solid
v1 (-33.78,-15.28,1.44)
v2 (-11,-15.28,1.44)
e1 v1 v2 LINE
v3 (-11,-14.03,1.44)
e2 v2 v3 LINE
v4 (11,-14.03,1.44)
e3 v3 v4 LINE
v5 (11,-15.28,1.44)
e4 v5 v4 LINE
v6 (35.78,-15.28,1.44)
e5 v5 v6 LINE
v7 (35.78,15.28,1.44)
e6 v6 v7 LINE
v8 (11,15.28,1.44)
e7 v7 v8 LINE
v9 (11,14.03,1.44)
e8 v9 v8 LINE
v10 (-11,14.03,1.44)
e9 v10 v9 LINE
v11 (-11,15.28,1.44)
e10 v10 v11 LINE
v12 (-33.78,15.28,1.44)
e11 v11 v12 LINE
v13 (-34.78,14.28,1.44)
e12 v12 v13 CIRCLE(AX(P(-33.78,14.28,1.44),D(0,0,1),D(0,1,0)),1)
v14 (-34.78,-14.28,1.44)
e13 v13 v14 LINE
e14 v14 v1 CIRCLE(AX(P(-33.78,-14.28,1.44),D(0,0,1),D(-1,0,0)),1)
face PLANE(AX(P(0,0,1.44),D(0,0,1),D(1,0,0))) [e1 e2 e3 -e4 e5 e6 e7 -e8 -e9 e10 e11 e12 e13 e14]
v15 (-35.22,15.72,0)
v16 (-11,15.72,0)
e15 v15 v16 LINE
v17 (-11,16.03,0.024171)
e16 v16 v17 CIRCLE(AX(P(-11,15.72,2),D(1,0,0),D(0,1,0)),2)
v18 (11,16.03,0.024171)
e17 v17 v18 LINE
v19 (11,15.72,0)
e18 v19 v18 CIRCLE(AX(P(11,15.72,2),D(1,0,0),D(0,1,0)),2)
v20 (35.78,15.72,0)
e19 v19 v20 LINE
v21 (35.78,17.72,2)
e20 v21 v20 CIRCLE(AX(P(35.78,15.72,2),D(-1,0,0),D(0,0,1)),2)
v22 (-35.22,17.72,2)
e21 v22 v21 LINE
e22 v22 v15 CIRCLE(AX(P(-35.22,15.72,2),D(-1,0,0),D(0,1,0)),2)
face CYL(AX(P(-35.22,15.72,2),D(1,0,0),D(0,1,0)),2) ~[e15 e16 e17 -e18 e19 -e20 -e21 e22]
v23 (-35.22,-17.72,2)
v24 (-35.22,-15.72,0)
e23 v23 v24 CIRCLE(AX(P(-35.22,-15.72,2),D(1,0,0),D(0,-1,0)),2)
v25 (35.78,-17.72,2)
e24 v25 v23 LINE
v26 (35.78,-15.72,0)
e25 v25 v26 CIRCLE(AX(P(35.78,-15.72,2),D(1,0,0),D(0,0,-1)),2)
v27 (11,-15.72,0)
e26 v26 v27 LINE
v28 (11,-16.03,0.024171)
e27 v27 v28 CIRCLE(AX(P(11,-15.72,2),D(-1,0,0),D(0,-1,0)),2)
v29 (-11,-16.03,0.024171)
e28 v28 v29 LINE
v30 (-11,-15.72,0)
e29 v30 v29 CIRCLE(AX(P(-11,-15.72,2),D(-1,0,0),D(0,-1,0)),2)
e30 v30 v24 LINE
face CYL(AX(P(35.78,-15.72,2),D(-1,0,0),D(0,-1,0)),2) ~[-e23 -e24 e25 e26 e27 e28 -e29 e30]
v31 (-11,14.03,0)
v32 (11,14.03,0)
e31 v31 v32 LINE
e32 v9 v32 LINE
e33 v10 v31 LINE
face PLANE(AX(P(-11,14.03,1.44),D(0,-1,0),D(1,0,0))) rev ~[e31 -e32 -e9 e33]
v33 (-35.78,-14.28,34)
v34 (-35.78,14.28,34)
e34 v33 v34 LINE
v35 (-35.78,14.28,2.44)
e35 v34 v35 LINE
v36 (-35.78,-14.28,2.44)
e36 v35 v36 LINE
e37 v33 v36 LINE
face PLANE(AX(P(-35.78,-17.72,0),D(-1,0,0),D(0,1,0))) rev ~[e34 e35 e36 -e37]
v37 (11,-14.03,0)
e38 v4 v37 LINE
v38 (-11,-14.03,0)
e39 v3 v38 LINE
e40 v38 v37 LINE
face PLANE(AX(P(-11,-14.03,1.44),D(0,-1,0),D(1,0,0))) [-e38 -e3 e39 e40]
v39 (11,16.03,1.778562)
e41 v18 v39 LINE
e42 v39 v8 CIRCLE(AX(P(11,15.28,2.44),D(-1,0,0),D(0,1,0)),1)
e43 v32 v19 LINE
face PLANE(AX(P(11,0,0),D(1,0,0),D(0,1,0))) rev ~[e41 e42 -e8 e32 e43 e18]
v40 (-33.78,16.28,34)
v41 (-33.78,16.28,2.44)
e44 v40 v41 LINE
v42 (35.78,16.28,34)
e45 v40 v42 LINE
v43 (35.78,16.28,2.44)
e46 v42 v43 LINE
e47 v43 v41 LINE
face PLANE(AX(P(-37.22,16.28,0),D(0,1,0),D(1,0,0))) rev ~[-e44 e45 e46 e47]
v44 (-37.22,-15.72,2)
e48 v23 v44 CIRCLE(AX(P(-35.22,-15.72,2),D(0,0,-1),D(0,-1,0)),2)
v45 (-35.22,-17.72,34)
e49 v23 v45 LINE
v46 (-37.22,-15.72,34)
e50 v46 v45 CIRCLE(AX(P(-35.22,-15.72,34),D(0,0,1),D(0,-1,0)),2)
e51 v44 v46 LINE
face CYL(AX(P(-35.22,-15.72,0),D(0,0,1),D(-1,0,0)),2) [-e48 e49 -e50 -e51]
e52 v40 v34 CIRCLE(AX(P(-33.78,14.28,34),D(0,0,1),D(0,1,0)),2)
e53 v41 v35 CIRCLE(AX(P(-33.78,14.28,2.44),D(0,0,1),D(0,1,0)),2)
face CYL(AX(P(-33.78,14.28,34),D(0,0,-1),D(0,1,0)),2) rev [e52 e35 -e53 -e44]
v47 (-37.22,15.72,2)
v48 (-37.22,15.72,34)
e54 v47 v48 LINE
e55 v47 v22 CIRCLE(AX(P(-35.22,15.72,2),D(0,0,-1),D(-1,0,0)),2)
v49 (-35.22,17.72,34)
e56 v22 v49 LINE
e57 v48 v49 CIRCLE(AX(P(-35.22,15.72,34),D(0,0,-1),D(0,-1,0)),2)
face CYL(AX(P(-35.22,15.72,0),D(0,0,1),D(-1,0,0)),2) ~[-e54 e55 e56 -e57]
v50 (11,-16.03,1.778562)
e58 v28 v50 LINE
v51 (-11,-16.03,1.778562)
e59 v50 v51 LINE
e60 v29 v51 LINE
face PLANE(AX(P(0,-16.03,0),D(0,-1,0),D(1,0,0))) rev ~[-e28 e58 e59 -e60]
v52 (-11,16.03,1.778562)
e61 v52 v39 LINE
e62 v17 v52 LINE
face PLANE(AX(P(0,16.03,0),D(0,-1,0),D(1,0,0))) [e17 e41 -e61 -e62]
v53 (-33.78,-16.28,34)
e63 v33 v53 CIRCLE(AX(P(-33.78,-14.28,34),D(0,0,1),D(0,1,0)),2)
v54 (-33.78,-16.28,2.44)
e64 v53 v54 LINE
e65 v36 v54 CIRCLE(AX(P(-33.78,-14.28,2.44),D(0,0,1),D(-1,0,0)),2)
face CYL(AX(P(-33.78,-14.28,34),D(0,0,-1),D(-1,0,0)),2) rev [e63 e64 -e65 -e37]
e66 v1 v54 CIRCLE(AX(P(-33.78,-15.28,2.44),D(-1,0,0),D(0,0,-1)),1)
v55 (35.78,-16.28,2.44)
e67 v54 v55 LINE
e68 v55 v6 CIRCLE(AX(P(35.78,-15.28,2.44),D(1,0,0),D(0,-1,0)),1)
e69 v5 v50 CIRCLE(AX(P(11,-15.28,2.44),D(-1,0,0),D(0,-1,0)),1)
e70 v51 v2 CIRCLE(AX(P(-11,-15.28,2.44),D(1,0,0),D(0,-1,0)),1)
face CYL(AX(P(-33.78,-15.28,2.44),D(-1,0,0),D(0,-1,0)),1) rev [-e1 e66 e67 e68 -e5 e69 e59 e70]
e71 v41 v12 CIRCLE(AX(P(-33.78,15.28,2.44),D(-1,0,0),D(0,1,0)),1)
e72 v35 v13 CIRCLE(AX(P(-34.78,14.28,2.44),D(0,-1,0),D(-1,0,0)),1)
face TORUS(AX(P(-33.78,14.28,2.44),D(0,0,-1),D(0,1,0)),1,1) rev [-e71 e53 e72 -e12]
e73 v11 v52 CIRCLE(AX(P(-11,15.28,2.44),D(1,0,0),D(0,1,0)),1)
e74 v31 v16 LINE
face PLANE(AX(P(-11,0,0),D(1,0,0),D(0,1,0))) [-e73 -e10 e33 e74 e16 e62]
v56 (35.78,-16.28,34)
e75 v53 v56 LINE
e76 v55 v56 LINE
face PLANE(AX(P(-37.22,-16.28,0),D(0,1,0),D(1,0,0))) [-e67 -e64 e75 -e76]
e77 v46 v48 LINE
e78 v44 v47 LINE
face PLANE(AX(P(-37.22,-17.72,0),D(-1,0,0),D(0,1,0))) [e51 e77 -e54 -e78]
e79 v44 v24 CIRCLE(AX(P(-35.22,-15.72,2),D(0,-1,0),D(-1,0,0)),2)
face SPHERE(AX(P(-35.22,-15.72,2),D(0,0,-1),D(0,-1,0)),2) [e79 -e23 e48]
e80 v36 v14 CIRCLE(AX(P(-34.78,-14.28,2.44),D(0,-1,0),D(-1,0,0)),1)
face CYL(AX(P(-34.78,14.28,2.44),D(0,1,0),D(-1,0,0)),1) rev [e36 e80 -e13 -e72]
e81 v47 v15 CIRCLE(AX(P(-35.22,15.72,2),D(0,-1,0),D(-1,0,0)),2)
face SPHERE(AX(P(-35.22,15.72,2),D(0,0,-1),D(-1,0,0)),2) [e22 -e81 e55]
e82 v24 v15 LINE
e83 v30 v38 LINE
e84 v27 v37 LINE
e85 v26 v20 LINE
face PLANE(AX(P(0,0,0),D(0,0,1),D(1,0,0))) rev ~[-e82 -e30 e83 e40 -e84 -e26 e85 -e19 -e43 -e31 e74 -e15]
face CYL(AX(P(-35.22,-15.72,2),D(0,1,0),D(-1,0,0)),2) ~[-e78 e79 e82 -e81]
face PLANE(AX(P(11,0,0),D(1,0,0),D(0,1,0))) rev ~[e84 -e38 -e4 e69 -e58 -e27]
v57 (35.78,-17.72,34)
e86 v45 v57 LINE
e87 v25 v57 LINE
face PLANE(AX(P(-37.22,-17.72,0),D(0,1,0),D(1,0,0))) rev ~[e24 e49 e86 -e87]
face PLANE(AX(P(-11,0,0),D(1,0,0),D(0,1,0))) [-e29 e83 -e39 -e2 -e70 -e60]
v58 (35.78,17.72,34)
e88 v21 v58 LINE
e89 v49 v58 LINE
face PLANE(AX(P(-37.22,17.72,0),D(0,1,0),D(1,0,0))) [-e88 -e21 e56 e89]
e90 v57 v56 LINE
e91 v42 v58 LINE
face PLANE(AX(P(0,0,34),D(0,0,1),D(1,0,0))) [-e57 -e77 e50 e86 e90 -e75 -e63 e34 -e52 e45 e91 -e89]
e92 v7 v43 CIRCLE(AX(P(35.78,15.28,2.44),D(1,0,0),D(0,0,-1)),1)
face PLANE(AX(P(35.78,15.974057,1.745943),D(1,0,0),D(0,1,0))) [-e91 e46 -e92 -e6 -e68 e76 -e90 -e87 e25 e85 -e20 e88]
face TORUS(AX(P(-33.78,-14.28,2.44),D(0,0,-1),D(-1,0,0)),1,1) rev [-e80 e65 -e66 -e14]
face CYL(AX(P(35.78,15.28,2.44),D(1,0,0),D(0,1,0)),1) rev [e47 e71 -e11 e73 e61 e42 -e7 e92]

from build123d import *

# Parameters (mm, degrees)
F0_W         = 74.44
F0_H         = 35.44
F1_DEPTH     = 34
F2_T         = -1.44
F3_DEPTH     = 1.44
F4_R         = 2
F5_R         = 2
F6_W         = 22
F6_H         = 2
F7_DEPTH     = 1.441
F8_T1_DEPTH  = 28.56
F8_T6_DEPTH  = 69.56
F8_T12_DEPTH = 69.56
F8_T18_DEPTH = 69.56
F8_T25_DEPTH = 69.56
F8_T31_DEPTH = 69.56
F8_T35_ANGLE = 90
F8_T37_ANGLE = 90
F8_T41_DEPTH = 69.56
F8_T47_DEPTH = 69.56
F8_T53_DEPTH = 69.56
F8_T60_DEPTH = 69.56
F8_T66_DEPTH = 69.56


# Not quite as in the source:
# - a fillet or chamfer that OpenCascade refuses, or shapes differently, is made with other operations: its cross-section is extruded or revolved along the edge and cut away or added


with BuildPart() as f1:
    # F0 (on Top) → F1 (new body)
    with BuildSketch(Plane.XY):
        Rectangle(F0_W, F0_H)
    extrude(amount=F1_DEPTH)

    # F2
    f2_openings = [f1.faces().sort_by_distance(p)[0] for p in [
        (0, 0, 34),
    ]]
    offset(amount=F2_T, openings=f2_openings)

    # F3 (cut): a face of the model
    f3_faces = [f1.faces().sort_by_distance(p)[0] for p in [
        (37.22, 0, 17),
    ]]
    extrude(f3_faces, amount=-F3_DEPTH, mode=Mode.SUBTRACT)

    # F4
    f4_edges = [f1.edges().sort_by_distance(p)[0] for p in [
        (-35.78, -16.28, 17.72),
        (-35.78, 16.28, 17.72),
        (-37.22, 17.72, 17),
        (-37.22, -17.72, 17),
    ]]
    fillet(f4_edges, radius=F4_R)

    # F5
    f5_edges = [f1.edges().sort_by_distance(p)[0] for p in [
        (-37.22, 0, 0),
        (0.28, -17.72, 0),
        (0.28, 17.72, 0),
    ]]
    fillet(f5_edges, radius=F5_R)

    # F6 (on face) → F7 (cut, through all)
    with BuildSketch(Plane.XY.offset(1.44)):
        with Locations((0, 15.03)):
            Rectangle(F6_W, F6_H)
        with Locations((0, -15.03)):
            Rectangle(F6_W, F6_H)
    extrude(amount=-F7_DEPTH, mode=Mode.SUBTRACT)

    # F8: fillet of radius 1 on 1 edges, made by hand

    # F8_s2 → F8_t1 (join)
    with BuildSketch(Plane.XZ.offset(-14.28)):
        with BuildLine():
            ThreePointArc((-35.78, 2.44), (-35.4871067812, 1.7328932188), (-34.78, 1.44))
            Line((-34.78, 1.44), (-35.78, 1.44))
            Line((-35.78, 1.44), (-35.78, 2.44))
        make_face()
    extrude(amount=F8_T1_DEPTH)


with BuildPart() as f8_tool4:
    # F8_s5 → F8_t6 (new body)
    with BuildSketch(Plane.YZ.offset(-33.78)):
        with BuildLine():
            ThreePointArc((-16.28, 2.44), (-15.9871067812, 1.7328932188), (-15.28, 1.44))
            Line((-15.28, 1.44), (-16.28, 1.44))
            Line((-16.28, 1.44), (-16.28, 2.44))
        make_face()
    extrude(amount=F8_T6_DEPTH)

    split(bisect_by=Plane.YZ.offset(-11), keep=Keep.BOTTOM)

    split(bisect_by=Plane.XZ.offset(16.03), keep=Keep.TOP)


with BuildPart() as f1_1:
    add(f1.part)

    # F8_t3: union F8_tool4
    add(f8_tool4.part)


with BuildPart() as f8_tool10:
    # F8_s11 → F8_t12 (new body)
    with BuildSketch(Plane.YZ.offset(-33.78)):
        with BuildLine():
            ThreePointArc((-16.28, 2.44), (-15.9871067812, 1.7328932188), (-15.28, 1.44))
            Line((-15.28, 1.44), (-16.28, 1.44))
            Line((-16.28, 1.44), (-16.28, 2.44))
        make_face()
    extrude(amount=F8_T12_DEPTH)

    split(bisect_by=Plane.YZ.offset(-11), keep=Keep.BOTTOM)

    split(bisect_by=Plane.XZ.offset(16.03), keep=Keep.BOTTOM)


with BuildPart() as f1_2:
    add(f1_1.part)

    # F8_t9: union F8_tool10
    add(f8_tool10.part)


with BuildPart() as f8_tool16:
    # F8_s17 → F8_t18 (new body)
    with BuildSketch(Plane.YZ.offset(-33.78)):
        with BuildLine():
            ThreePointArc((-16.28, 2.44), (-15.9871067812, 1.7328932188), (-15.28, 1.44))
            Line((-15.28, 1.44), (-16.28, 1.44))
            Line((-16.28, 1.44), (-16.28, 2.44))
        make_face()
    extrude(amount=F8_T18_DEPTH)

    split(bisect_by=Plane.YZ.offset(-11), keep=Keep.TOP)

    split(bisect_by=Plane.XZ.offset(16.03), keep=Keep.TOP)

    split(bisect_by=Plane.YZ.offset(11), keep=Keep.BOTTOM)


with BuildPart() as f1_3:
    add(f1_2.part)

    # F8_t15: union F8_tool16
    add(f8_tool16.part)


with BuildPart() as f8_tool23:
    # F8_s24 → F8_t25 (new body)
    with BuildSketch(Plane.YZ.offset(-33.78)):
        with BuildLine():
            ThreePointArc((-16.28, 2.44), (-15.9871067812, 1.7328932188), (-15.28, 1.44))
            Line((-15.28, 1.44), (-16.28, 1.44))
            Line((-16.28, 1.44), (-16.28, 2.44))
        make_face()
    extrude(amount=F8_T25_DEPTH)

    split(bisect_by=Plane.XZ.offset(16.03), keep=Keep.TOP)

    split(bisect_by=Plane.YZ.offset(11), keep=Keep.TOP)


with BuildPart() as f1_4:
    add(f1_3.part)

    # F8_t22: union F8_tool23
    add(f8_tool23.part)


with BuildPart() as f8_tool29:
    # F8_s30 → F8_t31 (new body)
    with BuildSketch(Plane.YZ.offset(-33.78)):
        with BuildLine():
            ThreePointArc((-16.28, 2.44), (-15.9871067812, 1.7328932188), (-15.28, 1.44))
            Line((-15.28, 1.44), (-16.28, 1.44))
            Line((-16.28, 1.44), (-16.28, 2.44))
        make_face()
    extrude(amount=F8_T31_DEPTH)

    split(bisect_by=Plane.XZ.offset(16.03), keep=Keep.BOTTOM)

    split(bisect_by=Plane.YZ.offset(11), keep=Keep.TOP)


with BuildPart() as f1_5:
    add(f1_4.part)

    # F8_t28: union F8_tool29
    add(f8_tool29.part)

    # F8_s34 → F8_t35 (revolve)
    with BuildSketch(Plane.XZ.offset(14.28)):
        with BuildLine():
            ThreePointArc((-35.78, 2.44), (-35.4871067812, 1.7328932188), (-34.78, 1.44))
            Line((-34.78, 1.44), (-35.78, 1.44))
            Line((-35.78, 1.44), (-35.78, 2.44))
        make_face()
    revolve(axis=Axis((-33.78, -14.28, 1.44), (0, 0, 1)), revolution_arc=F8_T35_ANGLE)

    # F8_s36 → F8_t37 (revolve)
    with BuildSketch(Plane.YZ.offset(-33.78)):
        with BuildLine():
            ThreePointArc((16.28, 2.44), (15.9871067812, 1.7328932188), (15.28, 1.44))
            Line((15.28, 1.44), (16.28, 1.44))
            Line((16.28, 1.44), (16.28, 2.44))
        make_face()
    revolve(axis=Axis((-33.78, 14.28, 1.44), (0, 0, 1)), revolution_arc=F8_T37_ANGLE)


with BuildPart() as f8_tool39:
    # F8_s40 → F8_t41 (new body)
    with BuildSketch(Plane.YZ.offset(35.78)):
        with BuildLine():
            ThreePointArc((16.28, 2.44), (15.9871067812, 1.7328932188), (15.28, 1.44))
            Line((15.28, 1.44), (16.28, 1.44))
            Line((16.28, 1.44), (16.28, 2.44))
        make_face()
    extrude(amount=-F8_T41_DEPTH)

    split(bisect_by=Plane.YZ.offset(11), keep=Keep.TOP)

    split(bisect_by=Plane.XZ.offset(-16.03), keep=Keep.BOTTOM)


with BuildPart() as f1_6:
    add(f1_5.part)

    # F8_t38: union F8_tool39
    add(f8_tool39.part)


with BuildPart() as f8_tool45:
    # F8_s46 → F8_t47 (new body)
    with BuildSketch(Plane.YZ.offset(35.78)):
        with BuildLine():
            ThreePointArc((16.28, 2.44), (15.9871067812, 1.7328932188), (15.28, 1.44))
            Line((15.28, 1.44), (16.28, 1.44))
            Line((16.28, 1.44), (16.28, 2.44))
        make_face()
    extrude(amount=-F8_T47_DEPTH)

    split(bisect_by=Plane.YZ.offset(11), keep=Keep.TOP)

    split(bisect_by=Plane.XZ.offset(-16.03), keep=Keep.TOP)


with BuildPart() as f1_7:
    add(f1_6.part)

    # F8_t44: union F8_tool45
    add(f8_tool45.part)


with BuildPart() as f8_tool51:
    # F8_s52 → F8_t53 (new body)
    with BuildSketch(Plane.YZ.offset(35.78)):
        with BuildLine():
            ThreePointArc((16.28, 2.44), (15.9871067812, 1.7328932188), (15.28, 1.44))
            Line((15.28, 1.44), (16.28, 1.44))
            Line((16.28, 1.44), (16.28, 2.44))
        make_face()
    extrude(amount=-F8_T53_DEPTH)

    split(bisect_by=Plane.YZ.offset(11), keep=Keep.BOTTOM)

    split(bisect_by=Plane.XZ.offset(-16.03), keep=Keep.BOTTOM)

    split(bisect_by=Plane.YZ.offset(-11), keep=Keep.TOP)


with BuildPart() as f1_8:
    add(f1_7.part)

    # F8_t50: union F8_tool51
    add(f8_tool51.part)


with BuildPart() as f8_tool58:
    # F8_s59 → F8_t60 (new body)
    with BuildSketch(Plane.YZ.offset(35.78)):
        with BuildLine():
            ThreePointArc((16.28, 2.44), (15.9871067812, 1.7328932188), (15.28, 1.44))
            Line((15.28, 1.44), (16.28, 1.44))
            Line((16.28, 1.44), (16.28, 2.44))
        make_face()
    extrude(amount=-F8_T60_DEPTH)

    split(bisect_by=Plane.XZ.offset(-16.03), keep=Keep.BOTTOM)

    split(bisect_by=Plane.YZ.offset(-11), keep=Keep.BOTTOM)


with BuildPart() as f1_9:
    add(f1_8.part)

    # F8_t57: union F8_tool58
    add(f8_tool58.part)


with BuildPart() as f8_tool64:
    # F8_s65 → F8_t66 (new body)
    with BuildSketch(Plane.YZ.offset(35.78)):
        with BuildLine():
            ThreePointArc((16.28, 2.44), (15.9871067812, 1.7328932188), (15.28, 1.44))
            Line((15.28, 1.44), (16.28, 1.44))
            Line((16.28, 1.44), (16.28, 2.44))
        make_face()
    extrude(amount=-F8_T66_DEPTH)

    split(bisect_by=Plane.XZ.offset(-16.03), keep=Keep.TOP)

    split(bisect_by=Plane.YZ.offset(-11), keep=Keep.BOTTOM)


with BuildPart() as f1_10:
    add(f1_9.part)

    # F8_t63: union F8_tool64
    add(f8_tool64.part)


solid = f1_10.part
